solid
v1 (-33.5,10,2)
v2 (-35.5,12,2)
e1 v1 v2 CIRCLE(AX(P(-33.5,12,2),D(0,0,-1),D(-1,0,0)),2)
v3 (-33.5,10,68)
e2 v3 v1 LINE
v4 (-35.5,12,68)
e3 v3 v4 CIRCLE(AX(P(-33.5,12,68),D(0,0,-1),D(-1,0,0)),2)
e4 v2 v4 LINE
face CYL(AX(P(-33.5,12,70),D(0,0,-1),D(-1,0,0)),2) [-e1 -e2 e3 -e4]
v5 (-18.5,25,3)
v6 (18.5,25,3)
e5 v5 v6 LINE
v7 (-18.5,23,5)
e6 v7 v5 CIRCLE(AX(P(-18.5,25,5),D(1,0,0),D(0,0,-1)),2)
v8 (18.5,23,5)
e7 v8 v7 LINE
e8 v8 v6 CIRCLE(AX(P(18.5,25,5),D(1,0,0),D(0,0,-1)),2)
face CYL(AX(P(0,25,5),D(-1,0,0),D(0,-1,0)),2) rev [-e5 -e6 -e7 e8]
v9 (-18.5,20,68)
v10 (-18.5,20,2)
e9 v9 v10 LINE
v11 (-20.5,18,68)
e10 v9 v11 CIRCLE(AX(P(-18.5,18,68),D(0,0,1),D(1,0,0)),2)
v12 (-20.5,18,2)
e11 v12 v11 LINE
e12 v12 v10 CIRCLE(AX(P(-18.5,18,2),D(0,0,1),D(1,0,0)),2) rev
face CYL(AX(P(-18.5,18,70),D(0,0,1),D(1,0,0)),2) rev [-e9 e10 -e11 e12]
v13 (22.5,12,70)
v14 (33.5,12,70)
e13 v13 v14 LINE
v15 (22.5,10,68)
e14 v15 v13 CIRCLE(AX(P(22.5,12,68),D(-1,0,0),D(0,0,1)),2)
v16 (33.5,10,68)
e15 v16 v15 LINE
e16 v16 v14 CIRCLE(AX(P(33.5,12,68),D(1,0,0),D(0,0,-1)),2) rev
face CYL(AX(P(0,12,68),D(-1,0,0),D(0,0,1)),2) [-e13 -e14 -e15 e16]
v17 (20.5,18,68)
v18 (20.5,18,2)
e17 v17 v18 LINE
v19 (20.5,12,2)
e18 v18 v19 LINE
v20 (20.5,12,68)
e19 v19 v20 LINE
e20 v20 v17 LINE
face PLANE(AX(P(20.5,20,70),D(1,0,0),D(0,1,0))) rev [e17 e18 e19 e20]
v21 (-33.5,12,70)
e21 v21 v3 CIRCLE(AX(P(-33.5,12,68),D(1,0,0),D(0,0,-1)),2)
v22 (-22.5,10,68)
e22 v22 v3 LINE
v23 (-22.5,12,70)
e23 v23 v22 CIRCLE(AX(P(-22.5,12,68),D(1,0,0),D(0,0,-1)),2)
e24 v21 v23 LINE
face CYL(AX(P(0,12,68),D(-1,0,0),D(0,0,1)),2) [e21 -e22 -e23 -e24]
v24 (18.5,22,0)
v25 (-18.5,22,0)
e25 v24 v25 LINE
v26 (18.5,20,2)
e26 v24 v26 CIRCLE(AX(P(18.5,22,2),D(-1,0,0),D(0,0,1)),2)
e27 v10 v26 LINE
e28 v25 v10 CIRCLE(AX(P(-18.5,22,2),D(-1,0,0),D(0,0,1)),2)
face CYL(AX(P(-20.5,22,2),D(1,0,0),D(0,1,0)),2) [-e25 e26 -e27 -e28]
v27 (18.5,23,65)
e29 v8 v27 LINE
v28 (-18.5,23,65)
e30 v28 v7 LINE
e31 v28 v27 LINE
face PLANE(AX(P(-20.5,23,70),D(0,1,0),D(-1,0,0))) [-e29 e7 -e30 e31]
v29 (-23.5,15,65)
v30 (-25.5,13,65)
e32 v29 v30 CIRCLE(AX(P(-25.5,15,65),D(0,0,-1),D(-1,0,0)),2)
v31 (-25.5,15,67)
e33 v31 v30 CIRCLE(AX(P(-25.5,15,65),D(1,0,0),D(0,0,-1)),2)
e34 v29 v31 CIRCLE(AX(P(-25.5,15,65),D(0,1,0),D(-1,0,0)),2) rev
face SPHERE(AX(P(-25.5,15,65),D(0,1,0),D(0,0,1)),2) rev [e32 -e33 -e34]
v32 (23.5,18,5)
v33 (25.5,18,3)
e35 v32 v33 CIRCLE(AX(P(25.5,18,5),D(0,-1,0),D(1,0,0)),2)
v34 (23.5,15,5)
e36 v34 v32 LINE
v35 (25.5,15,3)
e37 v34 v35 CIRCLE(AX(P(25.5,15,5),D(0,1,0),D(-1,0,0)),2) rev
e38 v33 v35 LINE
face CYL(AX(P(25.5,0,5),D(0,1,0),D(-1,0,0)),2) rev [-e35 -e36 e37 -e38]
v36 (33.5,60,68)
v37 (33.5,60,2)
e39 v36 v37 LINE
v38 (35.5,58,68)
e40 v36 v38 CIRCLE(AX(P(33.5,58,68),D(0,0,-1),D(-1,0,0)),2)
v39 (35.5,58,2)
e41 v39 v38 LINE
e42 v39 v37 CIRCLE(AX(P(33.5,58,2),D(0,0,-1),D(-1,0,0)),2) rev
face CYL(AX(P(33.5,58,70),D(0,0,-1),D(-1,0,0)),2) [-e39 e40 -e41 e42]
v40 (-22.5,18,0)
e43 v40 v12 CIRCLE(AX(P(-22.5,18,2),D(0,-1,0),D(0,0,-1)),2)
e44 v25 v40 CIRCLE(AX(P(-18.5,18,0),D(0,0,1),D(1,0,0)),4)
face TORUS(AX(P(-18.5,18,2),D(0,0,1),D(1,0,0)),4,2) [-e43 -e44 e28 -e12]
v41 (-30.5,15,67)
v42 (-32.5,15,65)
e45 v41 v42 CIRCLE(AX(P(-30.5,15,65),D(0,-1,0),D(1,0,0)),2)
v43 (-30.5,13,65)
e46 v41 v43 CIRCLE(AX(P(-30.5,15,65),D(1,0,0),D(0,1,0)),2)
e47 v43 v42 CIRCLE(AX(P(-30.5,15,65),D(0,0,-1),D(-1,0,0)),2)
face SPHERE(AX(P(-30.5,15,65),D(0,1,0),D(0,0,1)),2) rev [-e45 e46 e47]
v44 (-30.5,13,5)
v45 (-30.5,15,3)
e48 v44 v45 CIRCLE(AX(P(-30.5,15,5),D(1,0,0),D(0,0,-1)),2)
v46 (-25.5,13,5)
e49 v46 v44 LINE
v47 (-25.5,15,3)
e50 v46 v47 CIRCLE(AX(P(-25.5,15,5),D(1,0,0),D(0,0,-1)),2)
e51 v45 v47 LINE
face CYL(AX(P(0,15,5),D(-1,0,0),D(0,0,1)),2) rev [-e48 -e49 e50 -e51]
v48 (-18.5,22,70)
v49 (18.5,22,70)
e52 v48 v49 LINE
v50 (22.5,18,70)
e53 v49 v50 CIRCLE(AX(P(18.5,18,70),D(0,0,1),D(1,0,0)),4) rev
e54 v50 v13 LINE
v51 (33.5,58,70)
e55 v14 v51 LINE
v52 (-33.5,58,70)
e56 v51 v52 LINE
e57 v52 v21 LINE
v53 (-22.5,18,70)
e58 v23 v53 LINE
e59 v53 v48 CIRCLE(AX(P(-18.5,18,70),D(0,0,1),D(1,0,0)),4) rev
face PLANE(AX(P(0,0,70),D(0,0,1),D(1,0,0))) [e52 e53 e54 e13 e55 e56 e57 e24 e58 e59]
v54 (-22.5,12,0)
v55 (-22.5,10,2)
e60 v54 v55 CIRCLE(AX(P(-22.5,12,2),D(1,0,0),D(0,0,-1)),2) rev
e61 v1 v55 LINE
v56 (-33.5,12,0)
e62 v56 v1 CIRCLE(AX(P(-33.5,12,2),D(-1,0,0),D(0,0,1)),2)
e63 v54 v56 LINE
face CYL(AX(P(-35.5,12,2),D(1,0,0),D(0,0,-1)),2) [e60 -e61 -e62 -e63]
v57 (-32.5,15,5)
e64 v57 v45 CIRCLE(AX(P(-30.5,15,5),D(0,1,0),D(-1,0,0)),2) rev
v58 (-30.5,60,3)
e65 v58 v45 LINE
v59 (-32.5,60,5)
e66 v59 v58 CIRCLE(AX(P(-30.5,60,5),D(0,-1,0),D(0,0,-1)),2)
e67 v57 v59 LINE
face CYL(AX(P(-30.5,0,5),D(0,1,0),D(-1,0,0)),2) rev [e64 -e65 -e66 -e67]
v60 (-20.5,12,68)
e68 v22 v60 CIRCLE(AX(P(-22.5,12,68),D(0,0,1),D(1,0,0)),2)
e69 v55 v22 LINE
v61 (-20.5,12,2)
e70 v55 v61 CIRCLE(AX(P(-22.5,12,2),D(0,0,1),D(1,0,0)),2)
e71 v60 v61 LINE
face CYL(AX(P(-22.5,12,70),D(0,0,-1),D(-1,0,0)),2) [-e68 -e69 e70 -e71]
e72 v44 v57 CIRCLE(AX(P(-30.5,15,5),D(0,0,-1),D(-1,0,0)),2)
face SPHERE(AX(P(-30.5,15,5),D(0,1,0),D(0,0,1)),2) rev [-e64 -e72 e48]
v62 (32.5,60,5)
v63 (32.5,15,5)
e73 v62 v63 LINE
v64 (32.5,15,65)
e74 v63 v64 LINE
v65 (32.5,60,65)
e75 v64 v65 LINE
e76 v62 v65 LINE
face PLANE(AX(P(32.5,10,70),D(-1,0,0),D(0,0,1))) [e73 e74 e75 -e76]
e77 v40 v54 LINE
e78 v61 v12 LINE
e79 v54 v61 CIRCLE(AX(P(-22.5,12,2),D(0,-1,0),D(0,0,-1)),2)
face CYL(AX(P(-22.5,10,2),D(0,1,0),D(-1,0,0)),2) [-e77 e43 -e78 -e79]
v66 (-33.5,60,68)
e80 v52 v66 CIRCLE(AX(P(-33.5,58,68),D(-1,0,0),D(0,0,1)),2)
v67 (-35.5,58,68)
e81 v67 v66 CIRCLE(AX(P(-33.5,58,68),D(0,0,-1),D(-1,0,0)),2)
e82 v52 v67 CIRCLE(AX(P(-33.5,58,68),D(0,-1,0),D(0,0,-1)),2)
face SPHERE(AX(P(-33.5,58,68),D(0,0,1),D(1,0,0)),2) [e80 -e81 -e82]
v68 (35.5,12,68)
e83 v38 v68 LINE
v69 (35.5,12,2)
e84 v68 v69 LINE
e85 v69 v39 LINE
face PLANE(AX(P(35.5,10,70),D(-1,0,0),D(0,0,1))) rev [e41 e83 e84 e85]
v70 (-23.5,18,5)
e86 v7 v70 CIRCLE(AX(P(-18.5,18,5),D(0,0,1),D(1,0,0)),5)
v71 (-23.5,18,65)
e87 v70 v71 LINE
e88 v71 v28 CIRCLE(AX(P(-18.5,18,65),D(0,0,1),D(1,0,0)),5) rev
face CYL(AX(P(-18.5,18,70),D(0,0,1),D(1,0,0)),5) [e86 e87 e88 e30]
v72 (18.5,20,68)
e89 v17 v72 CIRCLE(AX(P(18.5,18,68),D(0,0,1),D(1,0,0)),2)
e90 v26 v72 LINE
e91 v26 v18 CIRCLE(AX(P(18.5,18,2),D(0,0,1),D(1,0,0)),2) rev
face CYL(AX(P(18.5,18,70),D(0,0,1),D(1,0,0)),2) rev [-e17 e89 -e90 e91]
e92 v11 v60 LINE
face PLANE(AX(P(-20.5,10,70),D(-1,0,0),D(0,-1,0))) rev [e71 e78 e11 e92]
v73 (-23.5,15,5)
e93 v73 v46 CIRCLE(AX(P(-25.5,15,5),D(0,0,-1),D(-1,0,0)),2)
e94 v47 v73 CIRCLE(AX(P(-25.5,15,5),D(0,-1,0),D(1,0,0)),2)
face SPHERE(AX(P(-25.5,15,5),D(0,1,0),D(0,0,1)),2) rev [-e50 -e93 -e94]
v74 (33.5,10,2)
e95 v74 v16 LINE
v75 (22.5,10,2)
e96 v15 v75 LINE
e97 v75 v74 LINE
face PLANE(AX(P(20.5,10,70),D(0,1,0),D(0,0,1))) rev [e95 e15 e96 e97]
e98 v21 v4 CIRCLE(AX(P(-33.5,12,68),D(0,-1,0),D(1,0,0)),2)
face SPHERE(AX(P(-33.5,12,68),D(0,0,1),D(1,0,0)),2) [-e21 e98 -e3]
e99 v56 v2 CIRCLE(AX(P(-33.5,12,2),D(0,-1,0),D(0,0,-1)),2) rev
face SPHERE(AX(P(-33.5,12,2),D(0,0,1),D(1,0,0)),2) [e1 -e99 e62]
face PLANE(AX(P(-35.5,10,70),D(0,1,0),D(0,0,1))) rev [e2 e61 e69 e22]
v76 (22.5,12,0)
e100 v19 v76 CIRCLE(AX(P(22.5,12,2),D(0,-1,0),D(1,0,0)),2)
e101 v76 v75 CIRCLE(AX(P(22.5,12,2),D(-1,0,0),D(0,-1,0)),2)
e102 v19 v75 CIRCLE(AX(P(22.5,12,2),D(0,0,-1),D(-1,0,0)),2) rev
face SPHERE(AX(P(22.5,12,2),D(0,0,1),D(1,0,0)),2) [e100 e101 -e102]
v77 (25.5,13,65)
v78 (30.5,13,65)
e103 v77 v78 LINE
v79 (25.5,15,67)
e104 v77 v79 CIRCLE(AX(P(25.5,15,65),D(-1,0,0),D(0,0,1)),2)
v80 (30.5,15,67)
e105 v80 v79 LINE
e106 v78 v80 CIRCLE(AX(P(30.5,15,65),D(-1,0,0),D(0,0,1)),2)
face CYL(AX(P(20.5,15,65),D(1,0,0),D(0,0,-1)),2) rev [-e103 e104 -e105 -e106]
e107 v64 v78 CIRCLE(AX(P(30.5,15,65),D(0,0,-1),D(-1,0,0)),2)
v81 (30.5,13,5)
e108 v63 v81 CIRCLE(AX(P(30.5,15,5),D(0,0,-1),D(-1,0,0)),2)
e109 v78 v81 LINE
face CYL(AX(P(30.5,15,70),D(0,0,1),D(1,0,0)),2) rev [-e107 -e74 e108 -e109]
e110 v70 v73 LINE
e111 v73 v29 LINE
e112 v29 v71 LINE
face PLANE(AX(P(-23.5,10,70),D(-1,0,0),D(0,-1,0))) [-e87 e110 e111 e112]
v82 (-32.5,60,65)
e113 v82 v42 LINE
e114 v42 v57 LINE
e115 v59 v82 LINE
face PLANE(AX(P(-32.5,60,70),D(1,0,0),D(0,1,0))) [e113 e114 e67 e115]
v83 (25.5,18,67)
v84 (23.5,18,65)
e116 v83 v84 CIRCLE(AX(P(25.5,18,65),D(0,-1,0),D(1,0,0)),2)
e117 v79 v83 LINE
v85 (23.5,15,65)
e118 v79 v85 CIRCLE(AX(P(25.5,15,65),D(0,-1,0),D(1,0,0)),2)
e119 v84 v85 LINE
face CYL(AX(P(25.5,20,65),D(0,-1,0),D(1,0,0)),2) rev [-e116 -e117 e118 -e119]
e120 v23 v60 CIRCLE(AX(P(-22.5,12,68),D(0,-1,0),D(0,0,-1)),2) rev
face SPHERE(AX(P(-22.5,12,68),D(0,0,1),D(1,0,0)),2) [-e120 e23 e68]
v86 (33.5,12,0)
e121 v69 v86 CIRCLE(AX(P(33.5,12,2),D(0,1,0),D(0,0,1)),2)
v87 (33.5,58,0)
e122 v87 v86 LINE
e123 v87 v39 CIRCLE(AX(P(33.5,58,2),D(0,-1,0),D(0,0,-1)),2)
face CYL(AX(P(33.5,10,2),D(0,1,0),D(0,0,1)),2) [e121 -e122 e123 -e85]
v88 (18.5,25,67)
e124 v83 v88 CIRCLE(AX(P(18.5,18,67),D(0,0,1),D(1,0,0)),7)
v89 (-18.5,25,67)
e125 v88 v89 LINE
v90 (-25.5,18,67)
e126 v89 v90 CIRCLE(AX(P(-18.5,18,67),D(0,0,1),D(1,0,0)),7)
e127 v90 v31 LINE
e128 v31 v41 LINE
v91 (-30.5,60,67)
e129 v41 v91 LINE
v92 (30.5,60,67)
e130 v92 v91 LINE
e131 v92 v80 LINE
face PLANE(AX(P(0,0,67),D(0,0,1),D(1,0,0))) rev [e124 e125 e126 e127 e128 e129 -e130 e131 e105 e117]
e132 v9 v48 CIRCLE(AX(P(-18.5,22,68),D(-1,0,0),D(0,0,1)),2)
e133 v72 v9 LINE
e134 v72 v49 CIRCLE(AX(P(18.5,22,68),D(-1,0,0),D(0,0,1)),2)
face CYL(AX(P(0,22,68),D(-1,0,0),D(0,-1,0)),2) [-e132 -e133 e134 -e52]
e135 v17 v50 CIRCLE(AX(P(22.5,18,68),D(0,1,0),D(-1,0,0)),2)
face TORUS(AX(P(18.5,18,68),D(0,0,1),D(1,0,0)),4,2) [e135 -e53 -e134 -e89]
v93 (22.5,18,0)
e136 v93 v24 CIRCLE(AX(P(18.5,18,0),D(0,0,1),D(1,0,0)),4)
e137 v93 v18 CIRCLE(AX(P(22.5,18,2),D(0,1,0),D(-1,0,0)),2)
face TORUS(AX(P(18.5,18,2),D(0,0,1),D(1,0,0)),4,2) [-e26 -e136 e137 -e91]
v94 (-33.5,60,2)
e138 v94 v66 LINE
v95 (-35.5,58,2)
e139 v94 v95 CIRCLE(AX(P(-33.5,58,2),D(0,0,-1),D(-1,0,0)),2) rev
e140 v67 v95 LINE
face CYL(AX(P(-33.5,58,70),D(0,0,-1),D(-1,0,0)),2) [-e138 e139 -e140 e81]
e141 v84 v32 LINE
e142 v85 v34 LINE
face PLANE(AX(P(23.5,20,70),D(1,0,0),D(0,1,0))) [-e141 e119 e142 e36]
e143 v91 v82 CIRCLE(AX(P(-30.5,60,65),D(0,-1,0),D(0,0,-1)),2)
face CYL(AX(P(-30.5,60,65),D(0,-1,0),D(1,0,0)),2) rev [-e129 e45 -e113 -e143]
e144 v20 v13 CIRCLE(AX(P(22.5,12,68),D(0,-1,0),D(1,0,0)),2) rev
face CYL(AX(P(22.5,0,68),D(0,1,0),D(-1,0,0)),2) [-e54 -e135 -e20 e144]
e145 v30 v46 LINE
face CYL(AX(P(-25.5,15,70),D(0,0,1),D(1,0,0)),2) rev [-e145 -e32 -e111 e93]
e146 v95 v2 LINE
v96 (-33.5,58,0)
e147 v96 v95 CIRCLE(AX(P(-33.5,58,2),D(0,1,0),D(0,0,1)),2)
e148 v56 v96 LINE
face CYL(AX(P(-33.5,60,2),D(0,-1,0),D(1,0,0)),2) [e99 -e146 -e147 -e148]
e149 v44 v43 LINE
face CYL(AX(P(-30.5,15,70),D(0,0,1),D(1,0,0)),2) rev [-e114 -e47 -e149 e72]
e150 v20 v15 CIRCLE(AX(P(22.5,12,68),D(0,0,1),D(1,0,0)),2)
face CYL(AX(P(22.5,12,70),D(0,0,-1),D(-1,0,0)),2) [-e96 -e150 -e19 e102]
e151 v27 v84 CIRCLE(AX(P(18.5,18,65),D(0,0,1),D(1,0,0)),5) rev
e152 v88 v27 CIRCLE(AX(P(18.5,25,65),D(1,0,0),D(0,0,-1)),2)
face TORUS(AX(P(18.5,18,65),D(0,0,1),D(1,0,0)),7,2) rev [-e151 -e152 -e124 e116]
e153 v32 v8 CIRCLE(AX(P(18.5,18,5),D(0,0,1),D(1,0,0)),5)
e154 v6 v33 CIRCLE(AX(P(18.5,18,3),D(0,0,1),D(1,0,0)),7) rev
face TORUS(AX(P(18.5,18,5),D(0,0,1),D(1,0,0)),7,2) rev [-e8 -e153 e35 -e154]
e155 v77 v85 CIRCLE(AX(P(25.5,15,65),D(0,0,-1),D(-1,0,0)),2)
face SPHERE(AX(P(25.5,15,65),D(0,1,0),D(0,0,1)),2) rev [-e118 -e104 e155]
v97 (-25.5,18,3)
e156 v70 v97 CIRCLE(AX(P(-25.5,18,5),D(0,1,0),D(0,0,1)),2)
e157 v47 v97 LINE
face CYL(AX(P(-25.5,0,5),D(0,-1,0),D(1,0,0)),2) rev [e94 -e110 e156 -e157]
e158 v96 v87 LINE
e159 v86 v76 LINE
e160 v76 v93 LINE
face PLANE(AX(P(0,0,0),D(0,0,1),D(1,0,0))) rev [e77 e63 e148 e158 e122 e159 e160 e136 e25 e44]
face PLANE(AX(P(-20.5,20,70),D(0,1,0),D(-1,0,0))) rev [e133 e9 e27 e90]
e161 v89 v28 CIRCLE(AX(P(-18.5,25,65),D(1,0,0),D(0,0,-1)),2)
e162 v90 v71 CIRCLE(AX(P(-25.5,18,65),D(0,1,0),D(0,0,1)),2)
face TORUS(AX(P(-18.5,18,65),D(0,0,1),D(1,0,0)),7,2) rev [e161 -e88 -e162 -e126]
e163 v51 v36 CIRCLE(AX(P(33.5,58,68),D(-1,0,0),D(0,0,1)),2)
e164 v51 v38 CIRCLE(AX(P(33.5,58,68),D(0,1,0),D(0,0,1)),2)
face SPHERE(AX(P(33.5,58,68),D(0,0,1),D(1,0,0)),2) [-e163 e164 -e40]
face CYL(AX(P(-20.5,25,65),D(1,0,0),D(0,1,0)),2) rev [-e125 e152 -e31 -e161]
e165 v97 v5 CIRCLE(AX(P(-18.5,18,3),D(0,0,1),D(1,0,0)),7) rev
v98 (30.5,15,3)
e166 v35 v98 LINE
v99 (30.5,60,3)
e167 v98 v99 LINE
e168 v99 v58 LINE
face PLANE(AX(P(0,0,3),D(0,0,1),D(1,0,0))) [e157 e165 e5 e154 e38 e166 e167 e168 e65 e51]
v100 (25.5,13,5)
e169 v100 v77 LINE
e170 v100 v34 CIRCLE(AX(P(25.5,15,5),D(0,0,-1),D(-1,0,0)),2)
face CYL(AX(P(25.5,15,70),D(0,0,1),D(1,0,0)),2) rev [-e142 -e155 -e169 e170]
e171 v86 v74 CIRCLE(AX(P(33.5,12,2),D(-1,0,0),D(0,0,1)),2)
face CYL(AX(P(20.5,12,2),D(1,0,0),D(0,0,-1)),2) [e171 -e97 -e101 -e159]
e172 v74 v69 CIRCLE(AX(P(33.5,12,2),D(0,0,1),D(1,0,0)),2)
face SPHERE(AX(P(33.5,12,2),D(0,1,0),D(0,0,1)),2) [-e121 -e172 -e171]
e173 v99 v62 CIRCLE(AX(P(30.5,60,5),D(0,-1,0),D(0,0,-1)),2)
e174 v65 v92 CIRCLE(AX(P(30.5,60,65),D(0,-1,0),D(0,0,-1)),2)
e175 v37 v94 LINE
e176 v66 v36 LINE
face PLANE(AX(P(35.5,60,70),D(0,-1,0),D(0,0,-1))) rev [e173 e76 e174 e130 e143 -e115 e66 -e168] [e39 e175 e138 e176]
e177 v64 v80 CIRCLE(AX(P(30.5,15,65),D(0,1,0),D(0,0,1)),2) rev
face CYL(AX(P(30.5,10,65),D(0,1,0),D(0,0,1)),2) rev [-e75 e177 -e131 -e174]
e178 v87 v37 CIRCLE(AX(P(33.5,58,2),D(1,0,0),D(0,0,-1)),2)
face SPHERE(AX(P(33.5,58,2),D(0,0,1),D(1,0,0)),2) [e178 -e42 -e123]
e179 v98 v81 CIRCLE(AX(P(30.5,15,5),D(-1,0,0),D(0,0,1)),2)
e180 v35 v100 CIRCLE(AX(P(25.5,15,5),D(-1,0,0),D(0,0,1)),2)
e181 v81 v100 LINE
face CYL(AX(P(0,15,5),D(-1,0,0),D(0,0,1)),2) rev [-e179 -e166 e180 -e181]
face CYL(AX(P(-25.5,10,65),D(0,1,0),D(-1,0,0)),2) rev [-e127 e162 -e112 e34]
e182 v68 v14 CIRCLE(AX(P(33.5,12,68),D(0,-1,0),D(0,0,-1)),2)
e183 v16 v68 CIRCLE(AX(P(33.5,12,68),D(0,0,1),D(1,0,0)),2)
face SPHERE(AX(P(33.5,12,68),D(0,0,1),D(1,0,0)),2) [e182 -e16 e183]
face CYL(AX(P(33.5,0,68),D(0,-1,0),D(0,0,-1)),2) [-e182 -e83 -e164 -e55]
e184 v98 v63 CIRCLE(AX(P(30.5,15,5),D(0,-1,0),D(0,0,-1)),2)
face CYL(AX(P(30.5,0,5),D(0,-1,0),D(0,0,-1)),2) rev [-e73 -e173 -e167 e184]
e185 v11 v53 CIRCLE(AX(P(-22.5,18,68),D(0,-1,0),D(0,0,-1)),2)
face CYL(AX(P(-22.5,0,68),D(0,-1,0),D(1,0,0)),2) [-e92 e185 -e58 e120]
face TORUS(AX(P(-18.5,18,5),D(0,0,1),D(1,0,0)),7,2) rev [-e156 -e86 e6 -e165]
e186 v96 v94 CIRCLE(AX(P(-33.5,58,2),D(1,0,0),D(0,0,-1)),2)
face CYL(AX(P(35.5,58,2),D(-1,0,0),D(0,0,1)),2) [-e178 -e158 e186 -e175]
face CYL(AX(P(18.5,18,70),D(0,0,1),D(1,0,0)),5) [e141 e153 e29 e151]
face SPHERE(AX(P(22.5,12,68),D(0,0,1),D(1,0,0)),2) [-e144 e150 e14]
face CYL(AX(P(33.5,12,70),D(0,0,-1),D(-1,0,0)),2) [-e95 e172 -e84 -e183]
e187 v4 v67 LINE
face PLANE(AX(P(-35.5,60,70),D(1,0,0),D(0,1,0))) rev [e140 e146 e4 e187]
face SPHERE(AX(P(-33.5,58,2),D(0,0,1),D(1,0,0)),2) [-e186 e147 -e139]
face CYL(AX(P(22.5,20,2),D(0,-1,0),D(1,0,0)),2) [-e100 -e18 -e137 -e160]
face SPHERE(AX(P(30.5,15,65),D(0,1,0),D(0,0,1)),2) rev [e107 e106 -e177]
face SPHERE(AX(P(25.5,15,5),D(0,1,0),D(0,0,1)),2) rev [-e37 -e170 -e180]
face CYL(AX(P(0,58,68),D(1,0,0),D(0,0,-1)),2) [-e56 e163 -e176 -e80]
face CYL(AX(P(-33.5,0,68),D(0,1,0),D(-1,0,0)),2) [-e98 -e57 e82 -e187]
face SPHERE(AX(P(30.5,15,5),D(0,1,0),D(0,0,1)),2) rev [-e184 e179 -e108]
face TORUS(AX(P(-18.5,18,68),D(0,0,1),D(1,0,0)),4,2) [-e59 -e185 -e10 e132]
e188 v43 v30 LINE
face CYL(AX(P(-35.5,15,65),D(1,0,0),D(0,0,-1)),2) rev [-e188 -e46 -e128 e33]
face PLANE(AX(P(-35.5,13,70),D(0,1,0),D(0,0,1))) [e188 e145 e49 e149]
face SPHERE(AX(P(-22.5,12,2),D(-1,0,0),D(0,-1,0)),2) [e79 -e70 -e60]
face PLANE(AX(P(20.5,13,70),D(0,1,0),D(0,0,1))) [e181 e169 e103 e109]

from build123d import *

# Parameters (mm, degrees)
BOSS_EXTRU_2_DEPTH = 70
CONG_4_R           = 2
CONG_3_R           = 2
CONG_5_R           = 2
CONG_6_R           = 2
COQUE1_START       = 3
COQUE1_DEPTH       = 64
CONG_7_R           = 2
CONG_8_R           = 2
CONG_11_R          = 2
CONG_12_R          = 2
CONG_13_R          = 2


# Read off the part's stored shape, not the designer's step: Coque1
with BuildPart() as part:
    # Esquisse2 → Boss.-Extru.2 (new body)
    with BuildSketch(Plane.XY):
        Polygon((-35.5, 10), (-20.5, 10), (-20.5, 20), (20.5, 20), (20.5, 10), (35.5, 10), (35.5, 60), (-35.5, 60), align=None)
    extrude(amount=BOSS_EXTRU_2_DEPTH)

    # Congé4
    cong_4_edges = [part.edges().sort_by_distance(p)[0] for p in [
        (-35.5, 60, 35),
    ]]
    fillet(cong_4_edges, radius=CONG_4_R)

    # Congé3
    cong_3_edges = [part.edges().sort_by_distance(p)[0] for p in [
        (35.5, 60, 35),
    ]]
    fillet(cong_3_edges, radius=CONG_3_R)

    # Congé5
    cong_5_edges = [part.edges().sort_by_distance(p)[0] for p in [
        (20.5, 20, 35),
    ]]
    fillet(cong_5_edges, radius=CONG_5_R)

    # Congé6
    cong_6_edges = [part.edges().sort_by_distance(p)[0] for p in [
        (-20.5, 20, 35),
    ]]
    fillet(cong_6_edges, radius=CONG_6_R)

    # Coque1 outline → Coque1 (cut)
    with BuildSketch(Plane.XY.offset(COQUE1_START)):
        with BuildLine():
            Line((-32.5, 60), (-32.5, 13))
            Line((-32.5, 13), (-23.5, 13))
            Line((-23.5, 13), (-23.5, 18))
            ThreePointArc((-23.5, 18), (-22.035533906, 21.535533906), (-18.5, 23))
            Line((-18.5, 23), (18.5, 23))
            ThreePointArc((18.5, 23), (22.035533906, 21.535533906), (23.5, 18))
            Line((23.5, 18), (23.5, 13))
            Line((23.5, 13), (32.5, 13))
            Line((32.5, 13), (32.5, 60))
            Line((32.5, 60), (-32.5, 60))
        make_face()
    extrude(amount=COQUE1_DEPTH, mode=Mode.SUBTRACT)

    # Congé7
    cong_7_edges = [part.edges().sort_by_distance(p)[0] for p in [
        (35.5, 34, 0),
        (34.914213562, 59.414213562, 0),
        (0, 60, 0),
        (-34.914213562, 59.414213562, 0),
        (-28, 10, 0),
        (-35.5, 10, 35),
        (-35.5, 34, 0),
    ]]
    fillet(cong_7_edges, radius=CONG_7_R)

    # Congé8
    cong_8_edges = [part.edges().sort_by_distance(p)[0] for p in [
        (-20.5, 14, 70),
        (35.5, 10, 36),
        (20.5, 10, 35),
        (-20.5, 10, 36),
        (28, 10, 70),
        (35.5, 34, 70),
        (-35.5, 35, 70),
        (-34.914213562, 59.414213562, 70),
        (0, 60, 70),
        (34.914213562, 59.414213562, 70),
        (20.5, 14, 0),
        (20.5, 14, 70),
        (19.914213562, 19.414213562, 0),
        (19.914213562, 19.414213562, 70),
        (0, 20, 0),
        (0, 20, 70),
        (-19.914213562, 19.414213562, 0),
        (-19.914213562, 19.414213562, 70),
        (-20.5, 15, 0),
        (34.914213562, 10, 0.585786438),
        (-27, 10, 70),
        (-20.5, 10.585786438, 0.585786438),
        (-34.914213562, 10.585786438, 70),
        (27, 10, 0),
    ]]
    fillet(cong_8_edges, radius=CONG_8_R)

    # Congé11
    cong_11_edges = [part.edges().sort_by_distance(p)[0] for p in [
        (-23.5, 15.5, 3),
        (0, 23, 3),
        (23.5, 15.5, 3),
        (-23.5, 15.5, 67),
        (-22.035533906, 21.535533906, 67),
        (0, 23, 67),
        (22.035533906, 21.535533906, 67),
        (23.5, 15.5, 67),
        (22.035533906, 21.535533906, 3),
        (-22.035533906, 21.535533906, 3),
    ]]
    fillet(cong_11_edges, radius=CONG_11_R)

    # Congé12
    cong_12_edges = [part.edges().sort_by_distance(p)[0] for p in [
        (-32.5, 36.5, 3),
        (32.5, 36.5, 3),
        (32.5, 36.5, 67),
        (-32.5, 36.5, 67),
    ]]
    fillet(cong_12_edges, radius=CONG_12_R)

    # Congé13
    cong_13_edges = [part.edges().sort_by_distance(p)[0] for p in [
        (-23.5, 13, 35),
        (28, 13, 67),
        (-24.085786438, 13, 3.585786438),
        (-24.085786438, 13, 66.414213562),
        (23.5, 13, 35),
        (28, 13, 3),
        (24.085786438, 13, 3.585786438),
        (24.085786438, 13, 66.414213562),
        (-32.5, 13, 35),
        (-28, 13, 67),
        (-28, 13, 3),
        (-31.914213562, 13, 3.585786438),
        (-31.914213562, 13, 66.414213562),
        (32.5, 13, 35),
        (31.914213562, 13, 3.585786438),
        (31.914213562, 13, 66.414213562),
    ]]
    fillet(cong_13_edges, radius=CONG_13_R)


solid = part.part
